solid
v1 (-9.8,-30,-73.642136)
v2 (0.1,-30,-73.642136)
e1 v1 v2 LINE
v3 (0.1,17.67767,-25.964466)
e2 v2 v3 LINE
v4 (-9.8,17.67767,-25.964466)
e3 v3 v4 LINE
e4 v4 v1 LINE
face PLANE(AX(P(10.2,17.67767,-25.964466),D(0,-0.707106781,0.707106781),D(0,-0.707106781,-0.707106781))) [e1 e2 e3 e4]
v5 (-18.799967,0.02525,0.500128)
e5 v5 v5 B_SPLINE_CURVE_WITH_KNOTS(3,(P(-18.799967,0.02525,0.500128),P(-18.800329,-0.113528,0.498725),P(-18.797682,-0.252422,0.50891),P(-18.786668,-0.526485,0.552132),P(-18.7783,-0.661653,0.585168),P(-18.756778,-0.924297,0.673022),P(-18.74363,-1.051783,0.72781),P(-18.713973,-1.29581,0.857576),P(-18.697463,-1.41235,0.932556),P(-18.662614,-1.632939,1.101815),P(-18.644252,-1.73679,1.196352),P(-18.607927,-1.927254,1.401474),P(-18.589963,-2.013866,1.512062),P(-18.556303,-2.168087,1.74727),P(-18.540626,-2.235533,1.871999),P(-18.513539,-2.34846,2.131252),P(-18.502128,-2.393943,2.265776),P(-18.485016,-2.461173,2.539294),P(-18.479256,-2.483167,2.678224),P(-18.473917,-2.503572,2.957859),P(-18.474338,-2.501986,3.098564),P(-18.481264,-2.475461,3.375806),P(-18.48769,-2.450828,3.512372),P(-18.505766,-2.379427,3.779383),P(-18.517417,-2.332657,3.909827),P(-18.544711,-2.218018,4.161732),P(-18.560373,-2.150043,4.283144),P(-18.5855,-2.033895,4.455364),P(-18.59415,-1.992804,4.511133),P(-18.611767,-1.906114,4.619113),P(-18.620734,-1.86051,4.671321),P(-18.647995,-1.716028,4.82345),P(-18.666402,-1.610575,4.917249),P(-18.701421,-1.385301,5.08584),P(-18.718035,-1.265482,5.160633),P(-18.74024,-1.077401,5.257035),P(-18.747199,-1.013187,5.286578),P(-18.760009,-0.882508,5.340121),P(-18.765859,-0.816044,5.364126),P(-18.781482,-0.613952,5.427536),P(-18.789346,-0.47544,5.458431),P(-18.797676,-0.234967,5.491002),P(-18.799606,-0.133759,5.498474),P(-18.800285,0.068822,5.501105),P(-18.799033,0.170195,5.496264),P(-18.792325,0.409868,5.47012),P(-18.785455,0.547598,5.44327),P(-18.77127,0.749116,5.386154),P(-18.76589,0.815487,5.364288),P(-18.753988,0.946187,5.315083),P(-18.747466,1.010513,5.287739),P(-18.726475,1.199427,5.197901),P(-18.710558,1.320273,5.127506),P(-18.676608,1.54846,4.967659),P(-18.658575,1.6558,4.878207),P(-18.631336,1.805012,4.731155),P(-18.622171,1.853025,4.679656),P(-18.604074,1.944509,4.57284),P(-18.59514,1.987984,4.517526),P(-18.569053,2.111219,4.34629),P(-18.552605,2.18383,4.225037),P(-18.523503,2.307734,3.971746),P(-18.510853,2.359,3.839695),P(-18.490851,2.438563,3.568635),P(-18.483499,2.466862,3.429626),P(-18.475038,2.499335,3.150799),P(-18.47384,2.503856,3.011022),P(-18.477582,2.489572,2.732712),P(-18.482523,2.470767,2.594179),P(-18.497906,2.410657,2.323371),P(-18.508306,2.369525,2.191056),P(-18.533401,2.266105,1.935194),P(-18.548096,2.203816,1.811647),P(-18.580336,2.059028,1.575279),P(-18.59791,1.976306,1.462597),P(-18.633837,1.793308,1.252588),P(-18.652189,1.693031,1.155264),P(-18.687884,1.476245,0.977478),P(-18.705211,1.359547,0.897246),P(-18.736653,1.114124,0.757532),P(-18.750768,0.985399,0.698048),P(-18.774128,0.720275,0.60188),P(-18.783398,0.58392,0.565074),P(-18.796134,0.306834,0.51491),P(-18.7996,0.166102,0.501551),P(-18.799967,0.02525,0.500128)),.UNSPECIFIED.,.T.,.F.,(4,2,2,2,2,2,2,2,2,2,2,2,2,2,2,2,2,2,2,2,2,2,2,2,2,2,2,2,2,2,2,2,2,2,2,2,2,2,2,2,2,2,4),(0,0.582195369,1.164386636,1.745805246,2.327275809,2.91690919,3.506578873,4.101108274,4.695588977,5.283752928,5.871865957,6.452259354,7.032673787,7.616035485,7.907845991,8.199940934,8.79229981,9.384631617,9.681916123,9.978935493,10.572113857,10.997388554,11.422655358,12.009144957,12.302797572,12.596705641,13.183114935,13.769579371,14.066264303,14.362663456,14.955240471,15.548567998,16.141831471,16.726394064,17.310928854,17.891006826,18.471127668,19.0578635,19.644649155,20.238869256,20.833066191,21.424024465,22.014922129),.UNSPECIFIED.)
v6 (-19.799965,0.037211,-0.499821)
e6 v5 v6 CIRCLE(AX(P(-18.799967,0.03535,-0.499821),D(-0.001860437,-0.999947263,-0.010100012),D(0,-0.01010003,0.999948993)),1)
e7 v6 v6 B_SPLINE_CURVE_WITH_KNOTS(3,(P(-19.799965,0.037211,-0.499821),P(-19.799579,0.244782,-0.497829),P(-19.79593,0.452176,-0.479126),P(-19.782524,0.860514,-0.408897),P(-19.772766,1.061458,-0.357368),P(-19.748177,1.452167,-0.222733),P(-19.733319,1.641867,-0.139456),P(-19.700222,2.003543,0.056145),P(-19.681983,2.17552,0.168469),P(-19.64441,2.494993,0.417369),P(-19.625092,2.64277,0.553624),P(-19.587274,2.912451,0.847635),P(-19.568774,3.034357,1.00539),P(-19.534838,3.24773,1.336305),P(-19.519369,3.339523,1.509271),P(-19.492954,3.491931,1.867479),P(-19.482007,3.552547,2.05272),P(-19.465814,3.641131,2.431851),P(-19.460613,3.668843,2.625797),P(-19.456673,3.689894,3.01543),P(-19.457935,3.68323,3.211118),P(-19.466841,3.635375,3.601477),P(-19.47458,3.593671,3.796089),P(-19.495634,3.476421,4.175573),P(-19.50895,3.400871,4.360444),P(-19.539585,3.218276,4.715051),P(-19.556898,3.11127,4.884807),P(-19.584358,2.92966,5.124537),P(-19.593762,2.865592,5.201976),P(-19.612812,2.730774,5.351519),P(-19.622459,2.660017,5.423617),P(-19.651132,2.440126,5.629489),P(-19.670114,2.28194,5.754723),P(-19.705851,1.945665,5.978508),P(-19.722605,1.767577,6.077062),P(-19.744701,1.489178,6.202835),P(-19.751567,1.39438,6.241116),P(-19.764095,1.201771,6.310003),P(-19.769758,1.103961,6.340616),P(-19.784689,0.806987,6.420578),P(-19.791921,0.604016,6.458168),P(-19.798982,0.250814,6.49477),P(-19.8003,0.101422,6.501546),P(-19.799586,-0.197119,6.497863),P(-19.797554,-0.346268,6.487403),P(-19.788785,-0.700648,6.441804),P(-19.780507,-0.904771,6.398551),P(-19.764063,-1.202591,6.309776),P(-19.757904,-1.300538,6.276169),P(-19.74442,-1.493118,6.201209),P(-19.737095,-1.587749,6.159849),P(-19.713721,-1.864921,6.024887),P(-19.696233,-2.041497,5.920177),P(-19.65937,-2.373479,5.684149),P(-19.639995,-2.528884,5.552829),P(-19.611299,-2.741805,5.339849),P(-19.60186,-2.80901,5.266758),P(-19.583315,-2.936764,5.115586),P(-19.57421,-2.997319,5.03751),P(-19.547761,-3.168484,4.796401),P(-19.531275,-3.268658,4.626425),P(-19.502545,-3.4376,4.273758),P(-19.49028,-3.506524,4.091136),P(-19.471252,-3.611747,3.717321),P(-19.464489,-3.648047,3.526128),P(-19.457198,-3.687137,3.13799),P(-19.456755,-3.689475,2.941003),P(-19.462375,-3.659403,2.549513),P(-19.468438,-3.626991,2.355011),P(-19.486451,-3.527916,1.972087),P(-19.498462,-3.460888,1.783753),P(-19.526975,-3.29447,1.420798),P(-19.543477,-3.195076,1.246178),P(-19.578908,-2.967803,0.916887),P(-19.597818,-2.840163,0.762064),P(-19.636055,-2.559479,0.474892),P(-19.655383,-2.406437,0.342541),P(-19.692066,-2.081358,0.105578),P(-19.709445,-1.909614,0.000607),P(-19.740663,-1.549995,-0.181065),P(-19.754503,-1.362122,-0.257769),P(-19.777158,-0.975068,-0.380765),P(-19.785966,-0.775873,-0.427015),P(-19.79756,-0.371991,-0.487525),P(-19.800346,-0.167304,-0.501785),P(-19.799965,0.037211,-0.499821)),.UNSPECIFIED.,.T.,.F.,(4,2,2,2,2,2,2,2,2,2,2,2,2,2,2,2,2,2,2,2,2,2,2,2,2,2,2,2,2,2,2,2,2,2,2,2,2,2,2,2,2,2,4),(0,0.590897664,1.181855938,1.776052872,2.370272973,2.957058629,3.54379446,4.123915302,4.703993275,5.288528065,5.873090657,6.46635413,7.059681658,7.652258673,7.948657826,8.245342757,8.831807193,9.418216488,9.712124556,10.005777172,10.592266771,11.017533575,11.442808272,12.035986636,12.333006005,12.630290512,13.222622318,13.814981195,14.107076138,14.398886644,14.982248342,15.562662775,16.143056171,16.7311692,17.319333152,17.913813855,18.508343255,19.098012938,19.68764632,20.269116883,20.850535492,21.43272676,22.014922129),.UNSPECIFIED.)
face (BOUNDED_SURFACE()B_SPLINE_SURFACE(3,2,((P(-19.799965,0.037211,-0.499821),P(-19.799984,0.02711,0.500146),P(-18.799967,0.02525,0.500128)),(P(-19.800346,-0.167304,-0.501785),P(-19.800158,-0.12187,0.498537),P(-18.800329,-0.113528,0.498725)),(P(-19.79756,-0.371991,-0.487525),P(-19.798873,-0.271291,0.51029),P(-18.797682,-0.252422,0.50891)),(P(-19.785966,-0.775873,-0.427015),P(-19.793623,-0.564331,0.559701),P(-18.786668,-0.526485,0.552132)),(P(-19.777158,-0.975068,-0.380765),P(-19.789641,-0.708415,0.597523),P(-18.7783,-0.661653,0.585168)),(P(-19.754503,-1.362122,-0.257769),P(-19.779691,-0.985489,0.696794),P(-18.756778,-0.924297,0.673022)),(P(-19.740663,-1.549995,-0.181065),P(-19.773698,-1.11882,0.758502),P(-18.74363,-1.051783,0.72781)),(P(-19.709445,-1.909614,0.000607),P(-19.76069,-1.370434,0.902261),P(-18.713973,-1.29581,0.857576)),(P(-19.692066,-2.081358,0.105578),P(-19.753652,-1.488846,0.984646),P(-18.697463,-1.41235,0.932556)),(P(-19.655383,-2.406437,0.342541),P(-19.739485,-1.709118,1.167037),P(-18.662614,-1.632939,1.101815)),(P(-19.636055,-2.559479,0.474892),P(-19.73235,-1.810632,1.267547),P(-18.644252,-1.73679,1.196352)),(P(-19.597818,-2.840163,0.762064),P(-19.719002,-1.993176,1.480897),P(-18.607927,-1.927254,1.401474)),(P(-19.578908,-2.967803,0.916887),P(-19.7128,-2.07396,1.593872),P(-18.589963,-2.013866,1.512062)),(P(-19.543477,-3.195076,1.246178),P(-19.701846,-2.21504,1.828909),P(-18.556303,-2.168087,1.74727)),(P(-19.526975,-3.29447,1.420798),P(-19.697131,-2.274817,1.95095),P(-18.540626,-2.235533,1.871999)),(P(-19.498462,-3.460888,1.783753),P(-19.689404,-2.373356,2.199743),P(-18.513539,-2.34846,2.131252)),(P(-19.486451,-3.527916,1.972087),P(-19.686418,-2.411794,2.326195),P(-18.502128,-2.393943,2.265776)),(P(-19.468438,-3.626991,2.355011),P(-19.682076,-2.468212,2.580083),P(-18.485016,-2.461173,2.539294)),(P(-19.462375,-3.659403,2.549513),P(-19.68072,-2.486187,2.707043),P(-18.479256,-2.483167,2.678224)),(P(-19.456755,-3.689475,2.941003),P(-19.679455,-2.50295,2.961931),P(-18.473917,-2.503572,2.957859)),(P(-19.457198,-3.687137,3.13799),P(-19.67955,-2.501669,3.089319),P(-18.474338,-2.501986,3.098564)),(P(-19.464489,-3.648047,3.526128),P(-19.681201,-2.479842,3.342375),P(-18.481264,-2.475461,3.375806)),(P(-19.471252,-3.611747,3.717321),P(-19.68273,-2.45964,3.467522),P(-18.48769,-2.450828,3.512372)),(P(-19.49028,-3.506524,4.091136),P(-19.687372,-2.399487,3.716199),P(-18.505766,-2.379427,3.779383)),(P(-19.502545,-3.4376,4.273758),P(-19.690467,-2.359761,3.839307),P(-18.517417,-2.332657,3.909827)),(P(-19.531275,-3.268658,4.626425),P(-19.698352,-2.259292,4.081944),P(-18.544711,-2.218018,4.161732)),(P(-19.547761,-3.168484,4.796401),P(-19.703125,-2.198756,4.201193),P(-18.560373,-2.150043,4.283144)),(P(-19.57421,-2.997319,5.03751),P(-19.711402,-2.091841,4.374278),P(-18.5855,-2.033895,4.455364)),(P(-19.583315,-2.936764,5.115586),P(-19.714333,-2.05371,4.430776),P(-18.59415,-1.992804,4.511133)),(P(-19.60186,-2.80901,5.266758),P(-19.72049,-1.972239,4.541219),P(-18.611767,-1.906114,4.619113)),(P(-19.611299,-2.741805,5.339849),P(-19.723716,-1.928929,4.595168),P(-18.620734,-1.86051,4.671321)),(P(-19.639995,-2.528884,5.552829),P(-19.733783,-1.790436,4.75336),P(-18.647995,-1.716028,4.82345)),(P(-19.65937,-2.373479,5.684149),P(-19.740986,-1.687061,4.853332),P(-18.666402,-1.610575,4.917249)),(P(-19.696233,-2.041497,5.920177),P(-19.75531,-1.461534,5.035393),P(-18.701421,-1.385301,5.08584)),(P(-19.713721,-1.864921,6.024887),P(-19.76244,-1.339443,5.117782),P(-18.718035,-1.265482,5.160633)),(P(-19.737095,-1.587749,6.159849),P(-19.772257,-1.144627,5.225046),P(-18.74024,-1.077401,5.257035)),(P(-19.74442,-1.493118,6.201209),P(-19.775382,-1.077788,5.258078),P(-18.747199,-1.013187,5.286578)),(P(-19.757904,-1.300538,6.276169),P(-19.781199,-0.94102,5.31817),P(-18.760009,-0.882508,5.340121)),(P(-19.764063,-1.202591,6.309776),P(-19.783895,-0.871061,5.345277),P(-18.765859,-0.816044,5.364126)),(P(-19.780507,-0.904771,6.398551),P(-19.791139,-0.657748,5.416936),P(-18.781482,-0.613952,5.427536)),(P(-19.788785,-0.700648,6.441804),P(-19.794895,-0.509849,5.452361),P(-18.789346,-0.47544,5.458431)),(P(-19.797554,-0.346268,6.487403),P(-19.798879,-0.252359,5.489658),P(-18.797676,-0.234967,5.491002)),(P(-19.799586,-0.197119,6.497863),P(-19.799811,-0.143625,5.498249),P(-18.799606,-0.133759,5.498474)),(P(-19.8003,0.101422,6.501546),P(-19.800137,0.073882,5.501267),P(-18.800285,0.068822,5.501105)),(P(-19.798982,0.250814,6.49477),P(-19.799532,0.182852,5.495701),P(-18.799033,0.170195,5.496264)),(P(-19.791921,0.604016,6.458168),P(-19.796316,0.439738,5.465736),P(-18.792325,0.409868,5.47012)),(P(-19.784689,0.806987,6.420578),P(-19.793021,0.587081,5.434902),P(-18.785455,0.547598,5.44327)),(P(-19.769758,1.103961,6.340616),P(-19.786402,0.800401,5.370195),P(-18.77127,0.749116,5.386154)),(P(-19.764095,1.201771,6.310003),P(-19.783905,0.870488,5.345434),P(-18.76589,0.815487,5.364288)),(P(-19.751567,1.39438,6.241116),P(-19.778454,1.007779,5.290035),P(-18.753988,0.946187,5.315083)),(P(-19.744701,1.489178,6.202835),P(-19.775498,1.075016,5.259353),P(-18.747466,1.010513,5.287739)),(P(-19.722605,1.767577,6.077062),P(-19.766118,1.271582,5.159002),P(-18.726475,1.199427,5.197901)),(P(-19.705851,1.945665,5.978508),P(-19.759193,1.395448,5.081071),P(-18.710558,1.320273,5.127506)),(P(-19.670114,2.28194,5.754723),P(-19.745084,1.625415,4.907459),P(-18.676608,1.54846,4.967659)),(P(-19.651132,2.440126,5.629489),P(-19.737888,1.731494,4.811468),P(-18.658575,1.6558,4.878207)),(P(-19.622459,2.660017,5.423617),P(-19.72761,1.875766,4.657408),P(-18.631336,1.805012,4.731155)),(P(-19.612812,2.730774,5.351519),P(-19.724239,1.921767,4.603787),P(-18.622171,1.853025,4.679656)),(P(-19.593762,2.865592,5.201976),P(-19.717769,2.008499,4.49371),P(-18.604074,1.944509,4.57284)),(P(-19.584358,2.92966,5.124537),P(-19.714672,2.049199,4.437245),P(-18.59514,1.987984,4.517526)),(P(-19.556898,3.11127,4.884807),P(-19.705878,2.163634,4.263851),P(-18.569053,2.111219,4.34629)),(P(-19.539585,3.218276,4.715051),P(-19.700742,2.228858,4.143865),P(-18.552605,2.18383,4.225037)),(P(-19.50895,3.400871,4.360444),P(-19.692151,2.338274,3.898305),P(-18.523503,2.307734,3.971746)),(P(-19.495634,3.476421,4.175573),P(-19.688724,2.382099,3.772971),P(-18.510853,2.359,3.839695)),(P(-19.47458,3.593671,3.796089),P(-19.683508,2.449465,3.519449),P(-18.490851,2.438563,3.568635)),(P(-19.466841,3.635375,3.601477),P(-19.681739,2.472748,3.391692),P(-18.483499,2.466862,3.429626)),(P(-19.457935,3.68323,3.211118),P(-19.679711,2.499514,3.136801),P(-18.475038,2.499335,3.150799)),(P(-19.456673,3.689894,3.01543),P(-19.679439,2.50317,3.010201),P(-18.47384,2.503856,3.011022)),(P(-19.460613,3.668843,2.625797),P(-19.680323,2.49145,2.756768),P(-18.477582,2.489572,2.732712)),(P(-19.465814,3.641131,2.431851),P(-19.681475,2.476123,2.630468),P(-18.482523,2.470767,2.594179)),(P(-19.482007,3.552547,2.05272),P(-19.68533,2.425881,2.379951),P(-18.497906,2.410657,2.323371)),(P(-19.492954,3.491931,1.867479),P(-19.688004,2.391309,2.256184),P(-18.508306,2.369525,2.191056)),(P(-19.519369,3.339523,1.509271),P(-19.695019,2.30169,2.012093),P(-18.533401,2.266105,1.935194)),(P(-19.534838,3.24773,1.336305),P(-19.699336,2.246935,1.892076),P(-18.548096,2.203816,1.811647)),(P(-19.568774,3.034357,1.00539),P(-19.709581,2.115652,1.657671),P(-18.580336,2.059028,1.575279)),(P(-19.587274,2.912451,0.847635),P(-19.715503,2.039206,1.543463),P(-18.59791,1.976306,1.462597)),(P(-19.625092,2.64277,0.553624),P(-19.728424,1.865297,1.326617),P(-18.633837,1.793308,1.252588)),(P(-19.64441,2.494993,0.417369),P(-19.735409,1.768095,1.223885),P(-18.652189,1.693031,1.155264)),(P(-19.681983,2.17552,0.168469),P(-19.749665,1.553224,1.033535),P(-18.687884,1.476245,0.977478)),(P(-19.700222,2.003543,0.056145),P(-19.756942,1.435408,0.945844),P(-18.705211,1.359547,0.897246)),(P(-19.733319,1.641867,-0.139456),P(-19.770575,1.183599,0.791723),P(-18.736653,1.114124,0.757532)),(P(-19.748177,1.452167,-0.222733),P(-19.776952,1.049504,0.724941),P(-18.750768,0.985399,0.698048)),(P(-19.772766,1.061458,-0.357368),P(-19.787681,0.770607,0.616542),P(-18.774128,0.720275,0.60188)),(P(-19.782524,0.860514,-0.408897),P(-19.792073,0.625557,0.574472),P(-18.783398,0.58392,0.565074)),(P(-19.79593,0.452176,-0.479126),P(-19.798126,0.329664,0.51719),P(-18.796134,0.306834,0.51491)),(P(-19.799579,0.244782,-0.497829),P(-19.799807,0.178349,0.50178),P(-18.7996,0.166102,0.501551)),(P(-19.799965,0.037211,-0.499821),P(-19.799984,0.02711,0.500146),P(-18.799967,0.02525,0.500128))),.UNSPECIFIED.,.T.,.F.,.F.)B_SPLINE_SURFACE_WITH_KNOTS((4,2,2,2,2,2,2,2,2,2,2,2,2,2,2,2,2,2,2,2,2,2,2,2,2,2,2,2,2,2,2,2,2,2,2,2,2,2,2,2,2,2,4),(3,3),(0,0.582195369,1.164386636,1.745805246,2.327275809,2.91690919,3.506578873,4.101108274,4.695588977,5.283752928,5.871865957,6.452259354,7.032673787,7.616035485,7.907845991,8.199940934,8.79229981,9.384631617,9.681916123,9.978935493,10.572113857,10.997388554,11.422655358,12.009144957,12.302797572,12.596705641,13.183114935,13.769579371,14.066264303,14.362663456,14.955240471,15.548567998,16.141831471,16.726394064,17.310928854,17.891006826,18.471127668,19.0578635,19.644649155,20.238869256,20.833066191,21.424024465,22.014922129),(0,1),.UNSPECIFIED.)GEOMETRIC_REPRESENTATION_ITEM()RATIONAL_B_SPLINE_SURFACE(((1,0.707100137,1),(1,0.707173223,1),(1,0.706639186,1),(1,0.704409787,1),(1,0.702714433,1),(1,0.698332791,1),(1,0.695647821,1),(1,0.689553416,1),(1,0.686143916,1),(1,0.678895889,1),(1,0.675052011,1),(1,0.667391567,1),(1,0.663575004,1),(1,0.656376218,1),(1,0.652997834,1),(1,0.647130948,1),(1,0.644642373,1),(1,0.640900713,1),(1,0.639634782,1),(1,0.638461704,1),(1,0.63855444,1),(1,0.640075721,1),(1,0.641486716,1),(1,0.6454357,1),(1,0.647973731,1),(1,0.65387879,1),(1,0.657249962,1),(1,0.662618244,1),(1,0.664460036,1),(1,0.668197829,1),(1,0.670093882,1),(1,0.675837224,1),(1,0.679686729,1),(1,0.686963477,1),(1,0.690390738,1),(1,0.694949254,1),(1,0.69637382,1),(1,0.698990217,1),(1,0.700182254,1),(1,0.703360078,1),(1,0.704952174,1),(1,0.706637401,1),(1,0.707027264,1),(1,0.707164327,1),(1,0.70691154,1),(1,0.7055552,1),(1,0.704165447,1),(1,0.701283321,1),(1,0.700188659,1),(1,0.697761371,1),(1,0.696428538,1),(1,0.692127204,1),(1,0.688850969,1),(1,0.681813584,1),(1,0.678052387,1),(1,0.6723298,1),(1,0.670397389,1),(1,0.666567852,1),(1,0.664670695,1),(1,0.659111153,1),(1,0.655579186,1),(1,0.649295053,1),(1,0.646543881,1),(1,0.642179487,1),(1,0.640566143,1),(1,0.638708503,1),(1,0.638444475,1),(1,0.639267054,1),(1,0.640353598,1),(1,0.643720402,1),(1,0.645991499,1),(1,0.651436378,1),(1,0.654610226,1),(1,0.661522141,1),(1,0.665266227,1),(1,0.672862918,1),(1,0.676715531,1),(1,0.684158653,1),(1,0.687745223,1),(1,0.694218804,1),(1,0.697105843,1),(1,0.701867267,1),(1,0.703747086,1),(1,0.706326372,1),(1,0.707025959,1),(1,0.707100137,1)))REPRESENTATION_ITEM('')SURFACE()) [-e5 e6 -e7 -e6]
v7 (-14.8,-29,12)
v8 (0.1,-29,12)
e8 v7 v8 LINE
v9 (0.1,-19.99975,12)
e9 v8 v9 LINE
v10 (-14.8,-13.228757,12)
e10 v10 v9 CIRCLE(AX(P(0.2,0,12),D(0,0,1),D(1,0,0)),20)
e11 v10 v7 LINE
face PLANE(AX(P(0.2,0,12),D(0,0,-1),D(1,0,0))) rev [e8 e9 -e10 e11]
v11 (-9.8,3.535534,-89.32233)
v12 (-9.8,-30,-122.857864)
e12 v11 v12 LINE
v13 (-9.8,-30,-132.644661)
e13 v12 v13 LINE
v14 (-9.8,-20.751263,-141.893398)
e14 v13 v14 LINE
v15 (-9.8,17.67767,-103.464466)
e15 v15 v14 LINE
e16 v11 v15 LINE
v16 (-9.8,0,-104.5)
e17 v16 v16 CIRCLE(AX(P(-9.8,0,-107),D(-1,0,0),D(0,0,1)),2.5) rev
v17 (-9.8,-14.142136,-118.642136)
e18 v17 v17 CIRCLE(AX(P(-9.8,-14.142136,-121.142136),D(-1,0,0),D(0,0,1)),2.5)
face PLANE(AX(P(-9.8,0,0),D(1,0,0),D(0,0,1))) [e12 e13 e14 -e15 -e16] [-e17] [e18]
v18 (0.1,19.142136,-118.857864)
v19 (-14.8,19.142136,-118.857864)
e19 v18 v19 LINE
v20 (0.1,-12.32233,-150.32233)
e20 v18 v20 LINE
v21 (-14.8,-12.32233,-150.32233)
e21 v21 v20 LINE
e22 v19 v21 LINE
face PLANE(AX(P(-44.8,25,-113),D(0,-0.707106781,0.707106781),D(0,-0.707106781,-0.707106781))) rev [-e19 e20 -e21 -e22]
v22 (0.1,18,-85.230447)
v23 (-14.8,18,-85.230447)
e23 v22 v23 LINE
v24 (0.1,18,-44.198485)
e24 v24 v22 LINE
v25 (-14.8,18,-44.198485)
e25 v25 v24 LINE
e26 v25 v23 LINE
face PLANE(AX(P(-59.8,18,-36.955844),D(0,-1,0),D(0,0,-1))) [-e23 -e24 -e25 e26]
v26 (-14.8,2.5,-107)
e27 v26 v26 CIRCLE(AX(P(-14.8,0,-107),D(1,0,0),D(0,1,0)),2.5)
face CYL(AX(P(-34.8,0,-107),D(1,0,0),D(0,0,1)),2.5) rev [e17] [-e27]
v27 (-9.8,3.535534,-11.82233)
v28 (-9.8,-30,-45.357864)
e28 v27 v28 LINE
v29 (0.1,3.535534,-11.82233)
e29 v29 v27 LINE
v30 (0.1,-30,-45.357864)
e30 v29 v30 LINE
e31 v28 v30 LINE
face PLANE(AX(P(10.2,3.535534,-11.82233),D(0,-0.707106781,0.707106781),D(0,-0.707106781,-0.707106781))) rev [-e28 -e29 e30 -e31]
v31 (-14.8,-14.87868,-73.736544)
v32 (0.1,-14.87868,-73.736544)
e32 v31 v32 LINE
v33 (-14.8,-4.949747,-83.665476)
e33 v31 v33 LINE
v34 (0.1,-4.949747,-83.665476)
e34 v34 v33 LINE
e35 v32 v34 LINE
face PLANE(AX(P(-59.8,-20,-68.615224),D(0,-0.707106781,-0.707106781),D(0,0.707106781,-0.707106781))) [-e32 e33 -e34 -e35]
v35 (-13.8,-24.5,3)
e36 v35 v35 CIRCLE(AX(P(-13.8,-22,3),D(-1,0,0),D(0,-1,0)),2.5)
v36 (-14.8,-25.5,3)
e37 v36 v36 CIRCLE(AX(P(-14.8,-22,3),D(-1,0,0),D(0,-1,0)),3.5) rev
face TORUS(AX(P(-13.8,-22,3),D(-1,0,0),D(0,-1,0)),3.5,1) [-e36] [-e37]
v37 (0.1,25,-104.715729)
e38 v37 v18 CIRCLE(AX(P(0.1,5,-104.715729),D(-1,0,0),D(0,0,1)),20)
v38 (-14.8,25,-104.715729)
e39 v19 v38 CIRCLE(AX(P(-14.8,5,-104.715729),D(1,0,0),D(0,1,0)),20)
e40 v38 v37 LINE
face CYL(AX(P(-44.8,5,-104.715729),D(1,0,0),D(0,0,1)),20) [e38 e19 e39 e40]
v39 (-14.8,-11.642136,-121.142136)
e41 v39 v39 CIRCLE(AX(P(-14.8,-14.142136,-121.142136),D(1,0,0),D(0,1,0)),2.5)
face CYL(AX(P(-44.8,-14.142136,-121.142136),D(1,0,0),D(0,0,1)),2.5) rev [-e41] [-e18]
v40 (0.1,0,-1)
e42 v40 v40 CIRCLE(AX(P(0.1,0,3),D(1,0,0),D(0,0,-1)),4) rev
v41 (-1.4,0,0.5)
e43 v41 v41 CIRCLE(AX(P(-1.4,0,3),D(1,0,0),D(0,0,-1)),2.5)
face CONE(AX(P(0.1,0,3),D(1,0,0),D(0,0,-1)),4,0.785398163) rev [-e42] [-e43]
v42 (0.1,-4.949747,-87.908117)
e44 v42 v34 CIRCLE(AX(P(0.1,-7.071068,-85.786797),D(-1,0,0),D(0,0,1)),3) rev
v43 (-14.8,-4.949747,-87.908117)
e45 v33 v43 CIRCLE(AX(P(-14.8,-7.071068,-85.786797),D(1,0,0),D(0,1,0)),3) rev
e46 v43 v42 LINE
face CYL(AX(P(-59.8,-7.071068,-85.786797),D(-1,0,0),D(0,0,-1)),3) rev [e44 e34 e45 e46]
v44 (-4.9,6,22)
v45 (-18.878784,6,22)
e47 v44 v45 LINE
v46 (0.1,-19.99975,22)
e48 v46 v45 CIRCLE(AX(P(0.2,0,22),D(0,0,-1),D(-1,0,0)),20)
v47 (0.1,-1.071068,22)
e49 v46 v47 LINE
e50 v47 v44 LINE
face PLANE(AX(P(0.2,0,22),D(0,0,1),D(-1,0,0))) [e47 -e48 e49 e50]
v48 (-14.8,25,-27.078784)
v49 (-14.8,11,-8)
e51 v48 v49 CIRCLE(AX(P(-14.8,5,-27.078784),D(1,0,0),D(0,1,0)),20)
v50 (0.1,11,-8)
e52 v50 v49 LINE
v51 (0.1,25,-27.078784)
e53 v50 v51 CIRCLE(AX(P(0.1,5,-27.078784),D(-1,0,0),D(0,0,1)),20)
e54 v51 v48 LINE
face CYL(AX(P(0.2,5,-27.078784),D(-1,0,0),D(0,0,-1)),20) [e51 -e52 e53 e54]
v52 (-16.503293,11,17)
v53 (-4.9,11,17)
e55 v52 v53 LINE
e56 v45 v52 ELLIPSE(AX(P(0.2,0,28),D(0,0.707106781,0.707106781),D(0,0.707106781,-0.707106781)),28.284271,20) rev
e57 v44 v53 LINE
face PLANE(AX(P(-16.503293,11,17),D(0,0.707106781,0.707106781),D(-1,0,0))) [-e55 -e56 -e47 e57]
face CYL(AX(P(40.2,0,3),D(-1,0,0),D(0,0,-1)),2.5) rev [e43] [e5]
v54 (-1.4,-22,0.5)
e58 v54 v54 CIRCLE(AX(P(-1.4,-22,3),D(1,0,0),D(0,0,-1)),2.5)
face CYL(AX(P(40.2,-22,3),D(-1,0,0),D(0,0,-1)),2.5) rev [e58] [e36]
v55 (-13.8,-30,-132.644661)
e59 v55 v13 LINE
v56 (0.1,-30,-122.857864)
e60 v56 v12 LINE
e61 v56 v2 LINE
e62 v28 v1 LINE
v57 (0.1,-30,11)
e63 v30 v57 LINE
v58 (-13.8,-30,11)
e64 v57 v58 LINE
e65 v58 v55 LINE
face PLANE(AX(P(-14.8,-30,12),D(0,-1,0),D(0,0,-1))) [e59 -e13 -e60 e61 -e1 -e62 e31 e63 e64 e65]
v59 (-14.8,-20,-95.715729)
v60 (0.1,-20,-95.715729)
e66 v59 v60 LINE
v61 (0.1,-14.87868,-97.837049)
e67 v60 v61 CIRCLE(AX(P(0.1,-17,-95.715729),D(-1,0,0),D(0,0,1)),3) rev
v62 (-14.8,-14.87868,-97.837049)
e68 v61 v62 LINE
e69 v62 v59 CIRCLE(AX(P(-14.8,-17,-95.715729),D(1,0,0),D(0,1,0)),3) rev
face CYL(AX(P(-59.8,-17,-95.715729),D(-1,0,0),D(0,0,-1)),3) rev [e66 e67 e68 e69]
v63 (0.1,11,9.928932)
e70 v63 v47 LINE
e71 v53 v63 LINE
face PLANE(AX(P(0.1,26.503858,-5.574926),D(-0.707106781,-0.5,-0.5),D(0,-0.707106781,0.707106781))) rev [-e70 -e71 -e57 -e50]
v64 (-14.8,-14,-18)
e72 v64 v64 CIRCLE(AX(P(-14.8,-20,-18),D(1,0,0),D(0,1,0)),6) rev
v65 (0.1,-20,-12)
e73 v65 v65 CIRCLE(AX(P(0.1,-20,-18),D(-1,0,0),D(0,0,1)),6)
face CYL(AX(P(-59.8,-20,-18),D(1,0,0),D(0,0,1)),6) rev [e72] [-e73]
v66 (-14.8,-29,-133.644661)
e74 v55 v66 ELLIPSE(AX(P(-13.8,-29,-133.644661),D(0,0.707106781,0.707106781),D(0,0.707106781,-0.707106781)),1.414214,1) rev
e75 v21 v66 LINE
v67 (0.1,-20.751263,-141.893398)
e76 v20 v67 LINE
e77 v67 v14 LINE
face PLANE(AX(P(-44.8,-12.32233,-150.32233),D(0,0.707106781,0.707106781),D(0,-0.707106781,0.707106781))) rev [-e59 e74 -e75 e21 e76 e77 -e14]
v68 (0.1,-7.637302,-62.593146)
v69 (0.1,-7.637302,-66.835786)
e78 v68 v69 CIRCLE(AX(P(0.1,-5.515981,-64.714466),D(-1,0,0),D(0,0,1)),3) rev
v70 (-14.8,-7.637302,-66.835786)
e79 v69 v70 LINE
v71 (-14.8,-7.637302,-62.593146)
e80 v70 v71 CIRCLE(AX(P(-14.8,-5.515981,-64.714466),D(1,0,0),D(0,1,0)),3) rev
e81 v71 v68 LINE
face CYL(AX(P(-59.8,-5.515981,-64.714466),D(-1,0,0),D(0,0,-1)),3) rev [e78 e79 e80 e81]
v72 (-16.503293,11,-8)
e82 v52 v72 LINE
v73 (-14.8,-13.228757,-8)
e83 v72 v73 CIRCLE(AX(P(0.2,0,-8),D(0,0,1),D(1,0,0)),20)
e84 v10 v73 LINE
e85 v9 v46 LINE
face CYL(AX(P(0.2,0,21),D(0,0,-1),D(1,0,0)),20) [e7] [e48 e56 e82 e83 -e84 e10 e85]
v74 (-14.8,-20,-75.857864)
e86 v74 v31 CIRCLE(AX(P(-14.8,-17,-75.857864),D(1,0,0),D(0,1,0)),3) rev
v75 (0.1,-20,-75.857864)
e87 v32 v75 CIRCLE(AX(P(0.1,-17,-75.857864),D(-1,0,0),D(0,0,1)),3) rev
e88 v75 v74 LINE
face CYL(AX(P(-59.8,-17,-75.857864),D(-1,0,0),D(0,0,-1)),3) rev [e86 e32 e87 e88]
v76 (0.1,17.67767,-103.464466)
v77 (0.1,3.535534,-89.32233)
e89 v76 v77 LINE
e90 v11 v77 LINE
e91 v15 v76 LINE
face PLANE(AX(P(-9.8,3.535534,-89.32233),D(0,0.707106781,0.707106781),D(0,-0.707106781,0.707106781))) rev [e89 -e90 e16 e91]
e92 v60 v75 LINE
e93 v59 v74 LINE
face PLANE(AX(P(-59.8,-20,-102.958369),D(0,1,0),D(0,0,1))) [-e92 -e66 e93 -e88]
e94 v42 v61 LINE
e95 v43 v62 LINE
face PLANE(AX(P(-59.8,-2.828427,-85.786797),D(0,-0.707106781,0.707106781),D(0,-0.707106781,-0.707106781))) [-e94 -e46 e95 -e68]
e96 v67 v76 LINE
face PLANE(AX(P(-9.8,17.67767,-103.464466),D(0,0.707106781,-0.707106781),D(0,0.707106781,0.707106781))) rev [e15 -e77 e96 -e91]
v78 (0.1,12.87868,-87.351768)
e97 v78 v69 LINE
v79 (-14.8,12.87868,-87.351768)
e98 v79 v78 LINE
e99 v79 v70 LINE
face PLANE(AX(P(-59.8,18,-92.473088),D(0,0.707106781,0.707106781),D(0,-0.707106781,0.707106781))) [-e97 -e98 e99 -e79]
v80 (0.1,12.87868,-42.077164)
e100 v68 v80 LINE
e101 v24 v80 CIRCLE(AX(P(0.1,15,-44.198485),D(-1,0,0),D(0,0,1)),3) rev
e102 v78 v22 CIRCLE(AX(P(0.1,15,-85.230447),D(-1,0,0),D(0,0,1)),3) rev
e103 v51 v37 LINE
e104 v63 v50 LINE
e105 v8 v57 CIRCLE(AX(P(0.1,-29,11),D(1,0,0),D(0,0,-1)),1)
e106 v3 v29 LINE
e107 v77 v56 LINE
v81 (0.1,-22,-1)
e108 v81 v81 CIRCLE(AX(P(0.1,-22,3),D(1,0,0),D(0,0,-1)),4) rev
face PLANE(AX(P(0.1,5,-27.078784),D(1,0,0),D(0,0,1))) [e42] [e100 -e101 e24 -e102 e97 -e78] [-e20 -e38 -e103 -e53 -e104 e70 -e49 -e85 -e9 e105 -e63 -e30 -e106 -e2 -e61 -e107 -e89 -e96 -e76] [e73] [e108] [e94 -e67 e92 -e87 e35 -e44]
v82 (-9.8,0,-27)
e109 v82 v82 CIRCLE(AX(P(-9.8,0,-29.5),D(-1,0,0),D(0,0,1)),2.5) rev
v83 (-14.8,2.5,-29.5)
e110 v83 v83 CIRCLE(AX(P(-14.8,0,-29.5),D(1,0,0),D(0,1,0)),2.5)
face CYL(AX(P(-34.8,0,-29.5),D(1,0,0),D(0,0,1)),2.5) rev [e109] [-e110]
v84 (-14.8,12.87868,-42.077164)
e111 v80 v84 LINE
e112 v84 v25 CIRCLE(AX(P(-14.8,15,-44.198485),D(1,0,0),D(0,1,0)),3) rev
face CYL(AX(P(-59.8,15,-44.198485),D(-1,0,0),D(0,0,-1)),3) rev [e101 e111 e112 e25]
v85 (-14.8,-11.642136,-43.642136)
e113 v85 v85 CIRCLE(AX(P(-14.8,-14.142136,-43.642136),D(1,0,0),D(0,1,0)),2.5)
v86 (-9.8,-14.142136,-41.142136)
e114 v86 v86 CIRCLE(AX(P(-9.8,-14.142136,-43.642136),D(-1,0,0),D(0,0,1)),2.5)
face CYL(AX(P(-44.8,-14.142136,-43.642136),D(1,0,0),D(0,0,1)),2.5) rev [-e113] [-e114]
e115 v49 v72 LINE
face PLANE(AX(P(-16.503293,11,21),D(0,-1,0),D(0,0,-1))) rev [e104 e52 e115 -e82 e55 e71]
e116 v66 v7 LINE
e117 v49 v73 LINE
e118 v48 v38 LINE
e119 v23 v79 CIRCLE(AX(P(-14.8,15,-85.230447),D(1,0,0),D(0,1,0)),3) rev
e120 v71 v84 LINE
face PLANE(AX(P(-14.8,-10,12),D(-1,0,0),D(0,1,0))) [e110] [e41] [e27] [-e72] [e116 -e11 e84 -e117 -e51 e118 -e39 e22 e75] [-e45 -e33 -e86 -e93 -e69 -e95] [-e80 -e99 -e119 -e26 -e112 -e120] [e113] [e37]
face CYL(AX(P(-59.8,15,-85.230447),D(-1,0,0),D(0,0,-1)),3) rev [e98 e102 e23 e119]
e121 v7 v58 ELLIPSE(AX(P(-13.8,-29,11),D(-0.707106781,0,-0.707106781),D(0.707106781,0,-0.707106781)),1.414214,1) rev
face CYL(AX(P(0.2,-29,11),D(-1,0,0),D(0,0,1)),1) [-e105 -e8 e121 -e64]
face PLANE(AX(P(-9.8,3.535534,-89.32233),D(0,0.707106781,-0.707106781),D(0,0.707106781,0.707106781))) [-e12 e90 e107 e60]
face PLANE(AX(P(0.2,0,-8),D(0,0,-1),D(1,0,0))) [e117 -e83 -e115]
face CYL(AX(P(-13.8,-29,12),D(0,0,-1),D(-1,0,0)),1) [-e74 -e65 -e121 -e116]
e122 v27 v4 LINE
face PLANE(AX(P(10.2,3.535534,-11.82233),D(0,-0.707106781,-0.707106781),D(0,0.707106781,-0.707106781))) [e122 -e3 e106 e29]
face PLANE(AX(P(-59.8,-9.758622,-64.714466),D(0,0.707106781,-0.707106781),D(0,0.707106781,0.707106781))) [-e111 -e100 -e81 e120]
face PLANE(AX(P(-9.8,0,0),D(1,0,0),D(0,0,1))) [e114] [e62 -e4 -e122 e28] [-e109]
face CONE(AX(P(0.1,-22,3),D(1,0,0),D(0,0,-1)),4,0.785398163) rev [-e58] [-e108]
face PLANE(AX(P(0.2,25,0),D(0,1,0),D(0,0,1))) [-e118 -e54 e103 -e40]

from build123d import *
from build123d.topology import SkipClean

# Parameters (mm, degrees)
EXTRUDE_1_DEPTH            = 21
SKETCH_2_W                 = 20
SKETCH_2_H                 = 20
CUT_EXTRUDE_1_DEPTH        = 10
SKETCH_3_R                 = 25
EXTRUDE_2_DEPTH            = 2
SKETCH_4_W                 = 20
SKETCH_4_H                 = 20
CUT_EXTRUDE_2_DEPTH        = 20
SKETCH_5_W                 = 67.669648092
SKETCH_5_H                 = 52.455829112
CUT_EXTRUDE_3_DEPTH        = 22
EXTRUDE_5_DEPTH            = 1
CUT_EXTRUDE_START          = -6
CUT_EXTRUDE_12_DEPTH       = 6
CUT_EXTRUDE_13_DEPTH       = 2
SKETCH_21_W                = 20
SKETCH_21_H                = 20
EXTRUDE_7_DEPTH            = 19
SKETCH_22_W                = 30
SKETCH_22_H                = 20
EXTRUDE_8_DEPTH            = 10
EXTRUDE_START              = 10
EXTRUDE_9_DEPTH            = 10
SKETCH_24_W                = 30
SKETCH_24_H                = 50
EXTRUDE_10_DEPTH           = 160
SKETCH_26_R                = 2.5
CUT_EXTRUDE_15_DEPTH       = 50
CUT_EXTRUDE_1_2_DEPTH      = 10
CUT_EXTRUDE_1_2_DEPTH_BACK = 10
SKETCH_28_W                = 30
SKETCH_28_H                = 160
EXTRUDE_11_DEPTH           = 5
CUT_EXTRUDE_16_DEPTH       = 25
CUT_EXTRUDE_16_DEPTH_BACK  = 60
SKETCH_29_R                = 2.5
CUT_EXTRUDE_17_DEPTH       = 60
CUT_EXTRUDE_18_DEPTH       = 60
CUT_EXTRUDE_18_DEPTH_BACK  = 60
CUT_EXTRUDE_19_DEPTH       = 60
CUT_EXTRUDE_19_DEPTH_BACK  = 60
FILLET_4_R                 = 3
CUT_EXTRUDE_20_DEPTH       = 60
CUT_EXTRUDE_20_DEPTH_BACK  = 60
SKETCH_33_R                = 6
CUT_EXTRUDE_21_DEPTH       = 60
FILLET_5_R                 = 20
SKETCH_35_R                = 2.5
CUT_EXTRUDE_22_DEPTH       = 60
FILLET_6_R                 = 20
SKETCH_36_W                = 257.466692503
SKETCH_36_H                = 187.225779306
CUT_EXTRUDE_23_DEPTH       = 82
CUT_EXTRUDE_24_DEPTH       = 0.1
CHAMFER_1_SIZE             = 1.5
FILLET_7_R                 = 1
FILLET_8_R                 = 1
CHAMFER_2_SIZE             = 5
CHAMFER_3_SIZE             = 5


with BuildPart() as part:
    # 草图1 → 凸台-拉伸1 (new body)
    with BuildSketch(Plane.XY):
        with BuildLine():
            Line((16.703293088, 11), (-16.703293088, 11))
            ThreePointArc((-16.703293088, 11), (0, -20), (16.703293088, 11))
        make_face()
    extrude(amount=EXTRUDE_1_DEPTH)

    # 草图2 → Cut-Extrude 1 (cut)
    with BuildSketch(Plane.XY.offset(21)):
        Rectangle(SKETCH_2_W, SKETCH_2_H)
    extrude(amount=-CUT_EXTRUDE_1_DEPTH, mode=Mode.SUBTRACT)

    # 草图3 → 凸台-拉伸2 (add)
    with BuildSketch(Plane(origin=(0, 0, 0), x_dir=(-1, 0, 0), z_dir=(0, 0, -1))):
        Circle(SKETCH_3_R)
        with BuildLine():
            Line((16.703293088, 11), (-16.703293088, 11))
            ThreePointArc((-16.703293088, 11), (0, -20), (16.703293088, 11))
        make_face(mode=Mode.SUBTRACT)
    extrude(amount=-EXTRUDE_2_DEPTH)

    # 草图4 → 切除-拉伸2 (cut)
    with BuildSketch(Plane.XY.offset(11)):
        Rectangle(SKETCH_4_W, SKETCH_4_H)
    extrude(amount=-CUT_EXTRUDE_2_DEPTH, mode=Mode.SUBTRACT)

    # 草图5 → 切除-拉伸3 (cut)
    with BuildSketch(Plane(origin=(0, 11, 0), x_dir=(1, 0, 0), z_dir=(0, 1, 0))):
        Rectangle(SKETCH_5_W, SKETCH_5_H)
    extrude(amount=CUT_EXTRUDE_3_DEPTH, mode=Mode.SUBTRACT)

    # 草图10 → 凸台-拉伸5 (add)
    with BuildSketch(Plane.XY.offset(21)):
        with BuildLine():
            Line((16.703293088, 11), (-16.703293088, 11))
            ThreePointArc((-16.703293088, 11), (0, -20), (16.703293088, 11))
        make_face()
    extrude(amount=EXTRUDE_5_DEPTH)

    # 草图18 → 切除-拉伸12 (cut)
    with SkipClean():  # the faces are left unmerged after this step: merging them gives an invalid solid
        with BuildSketch(Plane.XY.offset(2).offset(CUT_EXTRUDE_START)):
            with BuildLine():
                Line((-16.703293088, 11), (-22.449944321, 11))
                ThreePointArc((-22.449944321, 11), (0, -25), (22.449944321, 11))
                Line((22.449944321, 11), (16.703293088, 11))
                ThreePointArc((16.703293088, 11), (0, -20), (-16.703293088, 11))
            make_face()
        extrude(amount=CUT_EXTRUDE_12_DEPTH, mode=Mode.SUBTRACT)

    # 草图19 → 切除-拉伸13 (cut)
    with BuildSketch(Plane(origin=(0, 0, 0), x_dir=(-1, 0, 0), z_dir=(0, 0, -1))):
        with BuildLine():
            Line((16.703293088, 11), (-16.703293088, 11))
            ThreePointArc((-16.703293088, 11), (0, -20), (16.703293088, 11))
        make_face()
    extrude(amount=-CUT_EXTRUDE_13_DEPTH, mode=Mode.SUBTRACT)

    # 草图21 → 凸台-拉伸7 (add)
    with BuildSketch(Plane(origin=(0, 0, 21), x_dir=(-1, 0, 0), z_dir=(0, 0, -1))):
        Rectangle(SKETCH_21_W, SKETCH_21_H)
    extrude(amount=EXTRUDE_7_DEPTH)

    # 草图22 → 凸台-拉伸8 (add)
    with BuildSketch(Plane(origin=(0, 0, 2), x_dir=(-1, 0, 0), z_dir=(0, 0, -1))):
        with Locations((0, -20)):
            Rectangle(SKETCH_22_W, SKETCH_22_H)
    extrude(amount=-EXTRUDE_8_DEPTH)

    # 草图23 → 凸台-拉伸9 (add)
    with SkipClean():  # the faces are left unmerged after this step: merging them gives an invalid solid
        with BuildSketch(Plane(origin=(0, 0, 2), x_dir=(-1, 0, 0), z_dir=(0, 0, -1)).offset(EXTRUDE_START)):
            with BuildLine():
                Line((-15, -13.228756555), (-15, -30))
                Line((-15, -30), (15, -30))
                Line((15, -30), (15, -13.228756555))
                ThreePointArc((15, -13.228756555), (19.950760868, -1.402547961), (16.703293088, 11))
                Line((16.703293088, 11), (-16.703293088, 11))
                ThreePointArc((-16.703293088, 11), (-19.950760868, -1.402547961), (-15, -13.228756555))
            make_face()
        extrude(amount=-EXTRUDE_9_DEPTH)

    # 草图24 → 凸台-拉伸10 (add)
    with SkipClean():  # the faces are left unmerged after this step: merging them gives an invalid solid
        with BuildSketch(Plane(origin=(0, 0, -8), x_dir=(-1, 0, 0), z_dir=(0, 0, -1))):
            with Locations((0, -5)):
                Rectangle(SKETCH_24_W, SKETCH_24_H)
        extrude(amount=EXTRUDE_10_DEPTH)

    # 草图26 → 切除-拉伸15 (cut)
    with SkipClean():  # the faces are left unmerged after this step: merging them gives an invalid solid
        with BuildSketch(Plane.ZY.offset(15)):
            with Locations((-107, 0)):
                Circle(SKETCH_26_R)
            with Locations((-29.5, 0)):
                Circle(SKETCH_26_R)
        extrude(amount=-CUT_EXTRUDE_15_DEPTH, mode=Mode.SUBTRACT)

    # 草图27 → Cut-Extrude 1 2 (cut, two sides: drawn at the far end of the back side and taken through both)
    with SkipClean():  # the faces are left unmerged after this step: merging them gives an invalid solid
        with BuildSketch(Plane(origin=(0, 0, 0), x_dir=(0, 0, -1), z_dir=(1, 0, 0)).offset(-CUT_EXTRUDE_1_2_DEPTH_BACK)):
            Polygon((89.32233047, 3.535533906), (138.819805153, -45.961940777), (152.961940777, -31.819805153), (103.464466094, 17.67766953), align=None)
            Polygon((11.82233047, 3.535533906), (61.319805153, -45.961940777), (75.461940777, -31.819805153), (25.964466094, 17.67766953), align=None)
        extrude(amount=CUT_EXTRUDE_1_2_DEPTH + CUT_EXTRUDE_1_2_DEPTH_BACK, mode=Mode.SUBTRACT)

    # 草图28 → 凸台-拉伸11 (add)
    with SkipClean():  # the faces are left unmerged after this step: merging them gives an invalid solid
        with BuildSketch(Plane(origin=(0, 20, 0), x_dir=(1, 0, 0), z_dir=(0, 1, 0))):
            with Locations((0, 88)):
                Rectangle(SKETCH_28_W, SKETCH_28_H)
        extrude(amount=EXTRUDE_11_DEPTH)

    # 草图29 → 切除-拉伸16 (cut, two sides: drawn at the far end of the back side and taken through both)
    with SkipClean():  # the faces are left unmerged after this step: merging them gives an invalid solid
        with BuildSketch(Plane.ZY.offset(15).offset(-CUT_EXTRUDE_16_DEPTH_BACK)):
            with Locations(Location((3, 0, 0), (0, 0, 180))):
                Circle(SKETCH_29_R)
            with Locations(Location((3, -22, 0), (0, 0, 90))):
                Circle(SKETCH_29_R)
        extrude(amount=CUT_EXTRUDE_16_DEPTH + CUT_EXTRUDE_16_DEPTH_BACK, mode=Mode.SUBTRACT)

    # 草图30 → 切除-拉伸17 (cut)
    with SkipClean():  # the faces are left unmerged after this step: merging them gives an invalid solid
        with BuildSketch(Plane.ZY.offset(15)):
            Polygon((-113, 25), (-168, -30), (-168, 25), align=None)
        extrude(amount=-CUT_EXTRUDE_17_DEPTH, mode=Mode.SUBTRACT)

    # 草图31 → 切除-拉伸18 (cut, two sides: drawn at the far end of the back side and taken through both)
    with SkipClean():  # the faces are left unmerged after this step: merging them gives an invalid solid
        with BuildSketch(Plane(origin=(0, 0, 0), x_dir=(0, 0, -1), z_dir=(1, 0, 0)).offset(-CUT_EXTRUDE_18_DEPTH_BACK)):
            Polygon((92.473088065, 18), (64.714466094, -9.758621971), (36.955844123, 18), align=None)
        extrude(amount=CUT_EXTRUDE_18_DEPTH + CUT_EXTRUDE_18_DEPTH_BACK, mode=Mode.SUBTRACT)

    # 草图32 → 切除-拉伸19 (cut, two sides: drawn at the far end of the back side and taken through both)
    with SkipClean():  # the faces are left unmerged after this step: merging them gives an invalid solid
        with BuildSketch(Plane(origin=(0, 0, 0), x_dir=(0, 0, -1), z_dir=(1, 0, 0)).offset(-CUT_EXTRUDE_19_DEPTH_BACK)):
            Polygon((85.786796564, -2.828427125), (102.95836944, -20), (68.615223689, -20), align=None)
        extrude(amount=CUT_EXTRUDE_19_DEPTH + CUT_EXTRUDE_19_DEPTH_BACK, mode=Mode.SUBTRACT)

    # 圆角4
    fillet_4_edges = [part.edges().sort_by_distance(p)[0] for p in [
        (0, 18, -92.473088065),
        (0, 18, -36.955844123),
        (0, -9.758621971, -64.714466094),
        (0, -2.828427125, -85.786796564),
        (0, -20, -68.615223689),
        (0, -20, -102.95836944),
    ]]
    fillet(fillet_4_edges, radius=FILLET_4_R)

    # 草图33 → 切除-拉伸20 (cut, two sides: drawn at the far end of the back side and taken through both)
    with BuildSketch(Plane(origin=(0, 0, 0), x_dir=(0, 0, -1), z_dir=(1, 0, 0)).offset(-CUT_EXTRUDE_20_DEPTH_BACK)):
        with Locations(Location((18, -20, 0), (0, 0, 180))):
            Circle(SKETCH_33_R)
    extrude(amount=CUT_EXTRUDE_20_DEPTH + CUT_EXTRUDE_20_DEPTH_BACK, mode=Mode.SUBTRACT)

    # 草图34 → 切除-拉伸21 (cut)
    with BuildSketch(Plane.ZY.offset(15)):
        Polygon((-150.32233047, -12.32233047), (-132.644660941, -30), (-168, -30), align=None)
    extrude(amount=-CUT_EXTRUDE_21_DEPTH, mode=Mode.SUBTRACT)

    # 圆角5
    fillet_5_edges = [part.edges().sort_by_distance(p)[0] for p in [
        (0, 25, -113),
    ]]
    fillet(fillet_5_edges, radius=FILLET_5_R)

    # 草图35 → 切除-拉伸22 (cut)
    with BuildSketch(Plane.ZY.offset(15)):
        with Locations((-29.5, 0)):
            Circle(SKETCH_35_R)
        with Locations((-107, 0)):
            Circle(SKETCH_35_R)
        with Locations((-121.142135624, -14.142135624)):
            Circle(SKETCH_35_R)
        with Locations((-43.642135624, -14.142135624)):
            Circle(SKETCH_35_R)
    extrude(amount=-CUT_EXTRUDE_22_DEPTH, mode=Mode.SUBTRACT)

    # 圆角6
    # the kernel refuses this fillet: 20 mm, written as the material it takes off along each edge
    with BuildSketch(Plane(origin=(-62.696960071, 25, -8), x_dir=(0, 0, -1), z_dir=(1, 0, 0))) as fillet_6_piece_1:
        with BuildLine():
            CenterArc((19.078784028, -20), FILLET_6_R, 90, 72.542396876)
            Line((0, -14), (-0.381575681, -13.88))
            ThreePointArc((-0.381575681, -13.88), (-0.4, -7), (-0.4, 0))
            Line((-0.4, 0), (0, 0.4))
            Line((0, 0.4), (19.078784028, 0.4))
            Line((19.078784028, 0.4), (19.078784028, 0))
        make_face()
    extrude(amount=125.393920142, mode=Mode.SUBTRACT)

    # 草图36 → 切除-拉伸23 (cut)
    with BuildSketch(Plane(origin=(0, 0, 0), x_dir=(0, 0, -1), z_dir=(1, 0, 0))):
        with Locations((64.036181404, -32.621103346)):
            Rectangle(SKETCH_36_W, SKETCH_36_H)
    extrude(amount=-CUT_EXTRUDE_23_DEPTH, mode=Mode.SUBTRACT)

    # 草图37 → 切除-拉伸24 (cut)
    with BuildSketch(Plane.ZY):
        with BuildLine():
            Line((-11.82233047, 3.535533906), (-45.357864376, -30))
            Line((-45.357864376, -30), (12, -30))
            Line((12, -30), (12, -20))
            Line((12, -20), (22, -20))
            Line((22, -20), (22, 11))
            Line((22, 11), (-8, 11))
            ThreePointArc((-8, 11), (-15.246624462, 21.124515497), (-27.078784028, 25))
            Line((-27.078784028, 25), (-104.715728753, 25))
            ThreePointArc((-104.715728753, 25), (-112.3693974, 23.47759065), (-118.857864376, 19.142135624))
            Line((-118.857864376, 19.142135624), (-150.32233047, -12.32233047))
            Line((-150.32233047, -12.32233047), (-141.893398282, -20.751262658))
            Line((-141.893398282, -20.751262658), (-103.464466094, 17.67766953))
            Line((-103.464466094, 17.67766953), (-89.32233047, 3.535533906))
            Line((-89.32233047, 3.535533906), (-122.857864376, -30))
            Line((-122.857864376, -30), (-73.642135624, -30))
            Line((-73.642135624, -30), (-25.964466094, 17.67766953))
            Line((-25.964466094, 17.67766953), (-11.82233047, 3.535533906))
        make_face()
    extrude(amount=-CUT_EXTRUDE_24_DEPTH, mode=Mode.SUBTRACT)


with BuildPart() as body_2:
    # 镜向1: mirrored copy
    add(part.part.mirror(Plane(origin=(0.1, 5, -27.078784028), x_dir=(0, 0, 1), z_dir=(-1, 0, 0))))

    # 倒角1
    chamfer_1_edges = [body_2.edges().sort_by_distance(p)[0] for p in [
        (0.1, 0, 5.5),
        (0.1, -24.5, 3),
    ]]
    chamfer(chamfer_1_edges, length=CHAMFER_1_SIZE)

    # 圆角7
    fillet_7_edges = [body_2.edges().sort_by_distance(p)[0] for p in [
        (-19.8, 0, 5.5),
        (-14.8, -24.5, 3),
    ]]
    fillet(fillet_7_edges, radius=FILLET_7_R)

    # 圆角8
    fillet_8_edges = [body_2.edges().sort_by_distance(p)[0] for p in [
        (-14.8, -30, -60.32233047),
        (-7.35, -30, 12),
    ]]
    fillet(fillet_8_edges, radius=FILLET_8_R)

    # 倒角2
    chamfer_2_edges = [body_2.edges().sort_by_distance(p)[0] for p in [
        (-8.201646544, 11, 22),
    ]]
    chamfer(chamfer_2_edges, length=CHAMFER_2_SIZE)

    # 倒角3
    chamfer_3_edges = [body_2.edges().sort_by_distance(p)[0] for p in [
        (0.1, 8.5, 19.5),
    ]]
    chamfer(chamfer_3_edges, length=CHAMFER_3_SIZE)


solid = body_2.part
